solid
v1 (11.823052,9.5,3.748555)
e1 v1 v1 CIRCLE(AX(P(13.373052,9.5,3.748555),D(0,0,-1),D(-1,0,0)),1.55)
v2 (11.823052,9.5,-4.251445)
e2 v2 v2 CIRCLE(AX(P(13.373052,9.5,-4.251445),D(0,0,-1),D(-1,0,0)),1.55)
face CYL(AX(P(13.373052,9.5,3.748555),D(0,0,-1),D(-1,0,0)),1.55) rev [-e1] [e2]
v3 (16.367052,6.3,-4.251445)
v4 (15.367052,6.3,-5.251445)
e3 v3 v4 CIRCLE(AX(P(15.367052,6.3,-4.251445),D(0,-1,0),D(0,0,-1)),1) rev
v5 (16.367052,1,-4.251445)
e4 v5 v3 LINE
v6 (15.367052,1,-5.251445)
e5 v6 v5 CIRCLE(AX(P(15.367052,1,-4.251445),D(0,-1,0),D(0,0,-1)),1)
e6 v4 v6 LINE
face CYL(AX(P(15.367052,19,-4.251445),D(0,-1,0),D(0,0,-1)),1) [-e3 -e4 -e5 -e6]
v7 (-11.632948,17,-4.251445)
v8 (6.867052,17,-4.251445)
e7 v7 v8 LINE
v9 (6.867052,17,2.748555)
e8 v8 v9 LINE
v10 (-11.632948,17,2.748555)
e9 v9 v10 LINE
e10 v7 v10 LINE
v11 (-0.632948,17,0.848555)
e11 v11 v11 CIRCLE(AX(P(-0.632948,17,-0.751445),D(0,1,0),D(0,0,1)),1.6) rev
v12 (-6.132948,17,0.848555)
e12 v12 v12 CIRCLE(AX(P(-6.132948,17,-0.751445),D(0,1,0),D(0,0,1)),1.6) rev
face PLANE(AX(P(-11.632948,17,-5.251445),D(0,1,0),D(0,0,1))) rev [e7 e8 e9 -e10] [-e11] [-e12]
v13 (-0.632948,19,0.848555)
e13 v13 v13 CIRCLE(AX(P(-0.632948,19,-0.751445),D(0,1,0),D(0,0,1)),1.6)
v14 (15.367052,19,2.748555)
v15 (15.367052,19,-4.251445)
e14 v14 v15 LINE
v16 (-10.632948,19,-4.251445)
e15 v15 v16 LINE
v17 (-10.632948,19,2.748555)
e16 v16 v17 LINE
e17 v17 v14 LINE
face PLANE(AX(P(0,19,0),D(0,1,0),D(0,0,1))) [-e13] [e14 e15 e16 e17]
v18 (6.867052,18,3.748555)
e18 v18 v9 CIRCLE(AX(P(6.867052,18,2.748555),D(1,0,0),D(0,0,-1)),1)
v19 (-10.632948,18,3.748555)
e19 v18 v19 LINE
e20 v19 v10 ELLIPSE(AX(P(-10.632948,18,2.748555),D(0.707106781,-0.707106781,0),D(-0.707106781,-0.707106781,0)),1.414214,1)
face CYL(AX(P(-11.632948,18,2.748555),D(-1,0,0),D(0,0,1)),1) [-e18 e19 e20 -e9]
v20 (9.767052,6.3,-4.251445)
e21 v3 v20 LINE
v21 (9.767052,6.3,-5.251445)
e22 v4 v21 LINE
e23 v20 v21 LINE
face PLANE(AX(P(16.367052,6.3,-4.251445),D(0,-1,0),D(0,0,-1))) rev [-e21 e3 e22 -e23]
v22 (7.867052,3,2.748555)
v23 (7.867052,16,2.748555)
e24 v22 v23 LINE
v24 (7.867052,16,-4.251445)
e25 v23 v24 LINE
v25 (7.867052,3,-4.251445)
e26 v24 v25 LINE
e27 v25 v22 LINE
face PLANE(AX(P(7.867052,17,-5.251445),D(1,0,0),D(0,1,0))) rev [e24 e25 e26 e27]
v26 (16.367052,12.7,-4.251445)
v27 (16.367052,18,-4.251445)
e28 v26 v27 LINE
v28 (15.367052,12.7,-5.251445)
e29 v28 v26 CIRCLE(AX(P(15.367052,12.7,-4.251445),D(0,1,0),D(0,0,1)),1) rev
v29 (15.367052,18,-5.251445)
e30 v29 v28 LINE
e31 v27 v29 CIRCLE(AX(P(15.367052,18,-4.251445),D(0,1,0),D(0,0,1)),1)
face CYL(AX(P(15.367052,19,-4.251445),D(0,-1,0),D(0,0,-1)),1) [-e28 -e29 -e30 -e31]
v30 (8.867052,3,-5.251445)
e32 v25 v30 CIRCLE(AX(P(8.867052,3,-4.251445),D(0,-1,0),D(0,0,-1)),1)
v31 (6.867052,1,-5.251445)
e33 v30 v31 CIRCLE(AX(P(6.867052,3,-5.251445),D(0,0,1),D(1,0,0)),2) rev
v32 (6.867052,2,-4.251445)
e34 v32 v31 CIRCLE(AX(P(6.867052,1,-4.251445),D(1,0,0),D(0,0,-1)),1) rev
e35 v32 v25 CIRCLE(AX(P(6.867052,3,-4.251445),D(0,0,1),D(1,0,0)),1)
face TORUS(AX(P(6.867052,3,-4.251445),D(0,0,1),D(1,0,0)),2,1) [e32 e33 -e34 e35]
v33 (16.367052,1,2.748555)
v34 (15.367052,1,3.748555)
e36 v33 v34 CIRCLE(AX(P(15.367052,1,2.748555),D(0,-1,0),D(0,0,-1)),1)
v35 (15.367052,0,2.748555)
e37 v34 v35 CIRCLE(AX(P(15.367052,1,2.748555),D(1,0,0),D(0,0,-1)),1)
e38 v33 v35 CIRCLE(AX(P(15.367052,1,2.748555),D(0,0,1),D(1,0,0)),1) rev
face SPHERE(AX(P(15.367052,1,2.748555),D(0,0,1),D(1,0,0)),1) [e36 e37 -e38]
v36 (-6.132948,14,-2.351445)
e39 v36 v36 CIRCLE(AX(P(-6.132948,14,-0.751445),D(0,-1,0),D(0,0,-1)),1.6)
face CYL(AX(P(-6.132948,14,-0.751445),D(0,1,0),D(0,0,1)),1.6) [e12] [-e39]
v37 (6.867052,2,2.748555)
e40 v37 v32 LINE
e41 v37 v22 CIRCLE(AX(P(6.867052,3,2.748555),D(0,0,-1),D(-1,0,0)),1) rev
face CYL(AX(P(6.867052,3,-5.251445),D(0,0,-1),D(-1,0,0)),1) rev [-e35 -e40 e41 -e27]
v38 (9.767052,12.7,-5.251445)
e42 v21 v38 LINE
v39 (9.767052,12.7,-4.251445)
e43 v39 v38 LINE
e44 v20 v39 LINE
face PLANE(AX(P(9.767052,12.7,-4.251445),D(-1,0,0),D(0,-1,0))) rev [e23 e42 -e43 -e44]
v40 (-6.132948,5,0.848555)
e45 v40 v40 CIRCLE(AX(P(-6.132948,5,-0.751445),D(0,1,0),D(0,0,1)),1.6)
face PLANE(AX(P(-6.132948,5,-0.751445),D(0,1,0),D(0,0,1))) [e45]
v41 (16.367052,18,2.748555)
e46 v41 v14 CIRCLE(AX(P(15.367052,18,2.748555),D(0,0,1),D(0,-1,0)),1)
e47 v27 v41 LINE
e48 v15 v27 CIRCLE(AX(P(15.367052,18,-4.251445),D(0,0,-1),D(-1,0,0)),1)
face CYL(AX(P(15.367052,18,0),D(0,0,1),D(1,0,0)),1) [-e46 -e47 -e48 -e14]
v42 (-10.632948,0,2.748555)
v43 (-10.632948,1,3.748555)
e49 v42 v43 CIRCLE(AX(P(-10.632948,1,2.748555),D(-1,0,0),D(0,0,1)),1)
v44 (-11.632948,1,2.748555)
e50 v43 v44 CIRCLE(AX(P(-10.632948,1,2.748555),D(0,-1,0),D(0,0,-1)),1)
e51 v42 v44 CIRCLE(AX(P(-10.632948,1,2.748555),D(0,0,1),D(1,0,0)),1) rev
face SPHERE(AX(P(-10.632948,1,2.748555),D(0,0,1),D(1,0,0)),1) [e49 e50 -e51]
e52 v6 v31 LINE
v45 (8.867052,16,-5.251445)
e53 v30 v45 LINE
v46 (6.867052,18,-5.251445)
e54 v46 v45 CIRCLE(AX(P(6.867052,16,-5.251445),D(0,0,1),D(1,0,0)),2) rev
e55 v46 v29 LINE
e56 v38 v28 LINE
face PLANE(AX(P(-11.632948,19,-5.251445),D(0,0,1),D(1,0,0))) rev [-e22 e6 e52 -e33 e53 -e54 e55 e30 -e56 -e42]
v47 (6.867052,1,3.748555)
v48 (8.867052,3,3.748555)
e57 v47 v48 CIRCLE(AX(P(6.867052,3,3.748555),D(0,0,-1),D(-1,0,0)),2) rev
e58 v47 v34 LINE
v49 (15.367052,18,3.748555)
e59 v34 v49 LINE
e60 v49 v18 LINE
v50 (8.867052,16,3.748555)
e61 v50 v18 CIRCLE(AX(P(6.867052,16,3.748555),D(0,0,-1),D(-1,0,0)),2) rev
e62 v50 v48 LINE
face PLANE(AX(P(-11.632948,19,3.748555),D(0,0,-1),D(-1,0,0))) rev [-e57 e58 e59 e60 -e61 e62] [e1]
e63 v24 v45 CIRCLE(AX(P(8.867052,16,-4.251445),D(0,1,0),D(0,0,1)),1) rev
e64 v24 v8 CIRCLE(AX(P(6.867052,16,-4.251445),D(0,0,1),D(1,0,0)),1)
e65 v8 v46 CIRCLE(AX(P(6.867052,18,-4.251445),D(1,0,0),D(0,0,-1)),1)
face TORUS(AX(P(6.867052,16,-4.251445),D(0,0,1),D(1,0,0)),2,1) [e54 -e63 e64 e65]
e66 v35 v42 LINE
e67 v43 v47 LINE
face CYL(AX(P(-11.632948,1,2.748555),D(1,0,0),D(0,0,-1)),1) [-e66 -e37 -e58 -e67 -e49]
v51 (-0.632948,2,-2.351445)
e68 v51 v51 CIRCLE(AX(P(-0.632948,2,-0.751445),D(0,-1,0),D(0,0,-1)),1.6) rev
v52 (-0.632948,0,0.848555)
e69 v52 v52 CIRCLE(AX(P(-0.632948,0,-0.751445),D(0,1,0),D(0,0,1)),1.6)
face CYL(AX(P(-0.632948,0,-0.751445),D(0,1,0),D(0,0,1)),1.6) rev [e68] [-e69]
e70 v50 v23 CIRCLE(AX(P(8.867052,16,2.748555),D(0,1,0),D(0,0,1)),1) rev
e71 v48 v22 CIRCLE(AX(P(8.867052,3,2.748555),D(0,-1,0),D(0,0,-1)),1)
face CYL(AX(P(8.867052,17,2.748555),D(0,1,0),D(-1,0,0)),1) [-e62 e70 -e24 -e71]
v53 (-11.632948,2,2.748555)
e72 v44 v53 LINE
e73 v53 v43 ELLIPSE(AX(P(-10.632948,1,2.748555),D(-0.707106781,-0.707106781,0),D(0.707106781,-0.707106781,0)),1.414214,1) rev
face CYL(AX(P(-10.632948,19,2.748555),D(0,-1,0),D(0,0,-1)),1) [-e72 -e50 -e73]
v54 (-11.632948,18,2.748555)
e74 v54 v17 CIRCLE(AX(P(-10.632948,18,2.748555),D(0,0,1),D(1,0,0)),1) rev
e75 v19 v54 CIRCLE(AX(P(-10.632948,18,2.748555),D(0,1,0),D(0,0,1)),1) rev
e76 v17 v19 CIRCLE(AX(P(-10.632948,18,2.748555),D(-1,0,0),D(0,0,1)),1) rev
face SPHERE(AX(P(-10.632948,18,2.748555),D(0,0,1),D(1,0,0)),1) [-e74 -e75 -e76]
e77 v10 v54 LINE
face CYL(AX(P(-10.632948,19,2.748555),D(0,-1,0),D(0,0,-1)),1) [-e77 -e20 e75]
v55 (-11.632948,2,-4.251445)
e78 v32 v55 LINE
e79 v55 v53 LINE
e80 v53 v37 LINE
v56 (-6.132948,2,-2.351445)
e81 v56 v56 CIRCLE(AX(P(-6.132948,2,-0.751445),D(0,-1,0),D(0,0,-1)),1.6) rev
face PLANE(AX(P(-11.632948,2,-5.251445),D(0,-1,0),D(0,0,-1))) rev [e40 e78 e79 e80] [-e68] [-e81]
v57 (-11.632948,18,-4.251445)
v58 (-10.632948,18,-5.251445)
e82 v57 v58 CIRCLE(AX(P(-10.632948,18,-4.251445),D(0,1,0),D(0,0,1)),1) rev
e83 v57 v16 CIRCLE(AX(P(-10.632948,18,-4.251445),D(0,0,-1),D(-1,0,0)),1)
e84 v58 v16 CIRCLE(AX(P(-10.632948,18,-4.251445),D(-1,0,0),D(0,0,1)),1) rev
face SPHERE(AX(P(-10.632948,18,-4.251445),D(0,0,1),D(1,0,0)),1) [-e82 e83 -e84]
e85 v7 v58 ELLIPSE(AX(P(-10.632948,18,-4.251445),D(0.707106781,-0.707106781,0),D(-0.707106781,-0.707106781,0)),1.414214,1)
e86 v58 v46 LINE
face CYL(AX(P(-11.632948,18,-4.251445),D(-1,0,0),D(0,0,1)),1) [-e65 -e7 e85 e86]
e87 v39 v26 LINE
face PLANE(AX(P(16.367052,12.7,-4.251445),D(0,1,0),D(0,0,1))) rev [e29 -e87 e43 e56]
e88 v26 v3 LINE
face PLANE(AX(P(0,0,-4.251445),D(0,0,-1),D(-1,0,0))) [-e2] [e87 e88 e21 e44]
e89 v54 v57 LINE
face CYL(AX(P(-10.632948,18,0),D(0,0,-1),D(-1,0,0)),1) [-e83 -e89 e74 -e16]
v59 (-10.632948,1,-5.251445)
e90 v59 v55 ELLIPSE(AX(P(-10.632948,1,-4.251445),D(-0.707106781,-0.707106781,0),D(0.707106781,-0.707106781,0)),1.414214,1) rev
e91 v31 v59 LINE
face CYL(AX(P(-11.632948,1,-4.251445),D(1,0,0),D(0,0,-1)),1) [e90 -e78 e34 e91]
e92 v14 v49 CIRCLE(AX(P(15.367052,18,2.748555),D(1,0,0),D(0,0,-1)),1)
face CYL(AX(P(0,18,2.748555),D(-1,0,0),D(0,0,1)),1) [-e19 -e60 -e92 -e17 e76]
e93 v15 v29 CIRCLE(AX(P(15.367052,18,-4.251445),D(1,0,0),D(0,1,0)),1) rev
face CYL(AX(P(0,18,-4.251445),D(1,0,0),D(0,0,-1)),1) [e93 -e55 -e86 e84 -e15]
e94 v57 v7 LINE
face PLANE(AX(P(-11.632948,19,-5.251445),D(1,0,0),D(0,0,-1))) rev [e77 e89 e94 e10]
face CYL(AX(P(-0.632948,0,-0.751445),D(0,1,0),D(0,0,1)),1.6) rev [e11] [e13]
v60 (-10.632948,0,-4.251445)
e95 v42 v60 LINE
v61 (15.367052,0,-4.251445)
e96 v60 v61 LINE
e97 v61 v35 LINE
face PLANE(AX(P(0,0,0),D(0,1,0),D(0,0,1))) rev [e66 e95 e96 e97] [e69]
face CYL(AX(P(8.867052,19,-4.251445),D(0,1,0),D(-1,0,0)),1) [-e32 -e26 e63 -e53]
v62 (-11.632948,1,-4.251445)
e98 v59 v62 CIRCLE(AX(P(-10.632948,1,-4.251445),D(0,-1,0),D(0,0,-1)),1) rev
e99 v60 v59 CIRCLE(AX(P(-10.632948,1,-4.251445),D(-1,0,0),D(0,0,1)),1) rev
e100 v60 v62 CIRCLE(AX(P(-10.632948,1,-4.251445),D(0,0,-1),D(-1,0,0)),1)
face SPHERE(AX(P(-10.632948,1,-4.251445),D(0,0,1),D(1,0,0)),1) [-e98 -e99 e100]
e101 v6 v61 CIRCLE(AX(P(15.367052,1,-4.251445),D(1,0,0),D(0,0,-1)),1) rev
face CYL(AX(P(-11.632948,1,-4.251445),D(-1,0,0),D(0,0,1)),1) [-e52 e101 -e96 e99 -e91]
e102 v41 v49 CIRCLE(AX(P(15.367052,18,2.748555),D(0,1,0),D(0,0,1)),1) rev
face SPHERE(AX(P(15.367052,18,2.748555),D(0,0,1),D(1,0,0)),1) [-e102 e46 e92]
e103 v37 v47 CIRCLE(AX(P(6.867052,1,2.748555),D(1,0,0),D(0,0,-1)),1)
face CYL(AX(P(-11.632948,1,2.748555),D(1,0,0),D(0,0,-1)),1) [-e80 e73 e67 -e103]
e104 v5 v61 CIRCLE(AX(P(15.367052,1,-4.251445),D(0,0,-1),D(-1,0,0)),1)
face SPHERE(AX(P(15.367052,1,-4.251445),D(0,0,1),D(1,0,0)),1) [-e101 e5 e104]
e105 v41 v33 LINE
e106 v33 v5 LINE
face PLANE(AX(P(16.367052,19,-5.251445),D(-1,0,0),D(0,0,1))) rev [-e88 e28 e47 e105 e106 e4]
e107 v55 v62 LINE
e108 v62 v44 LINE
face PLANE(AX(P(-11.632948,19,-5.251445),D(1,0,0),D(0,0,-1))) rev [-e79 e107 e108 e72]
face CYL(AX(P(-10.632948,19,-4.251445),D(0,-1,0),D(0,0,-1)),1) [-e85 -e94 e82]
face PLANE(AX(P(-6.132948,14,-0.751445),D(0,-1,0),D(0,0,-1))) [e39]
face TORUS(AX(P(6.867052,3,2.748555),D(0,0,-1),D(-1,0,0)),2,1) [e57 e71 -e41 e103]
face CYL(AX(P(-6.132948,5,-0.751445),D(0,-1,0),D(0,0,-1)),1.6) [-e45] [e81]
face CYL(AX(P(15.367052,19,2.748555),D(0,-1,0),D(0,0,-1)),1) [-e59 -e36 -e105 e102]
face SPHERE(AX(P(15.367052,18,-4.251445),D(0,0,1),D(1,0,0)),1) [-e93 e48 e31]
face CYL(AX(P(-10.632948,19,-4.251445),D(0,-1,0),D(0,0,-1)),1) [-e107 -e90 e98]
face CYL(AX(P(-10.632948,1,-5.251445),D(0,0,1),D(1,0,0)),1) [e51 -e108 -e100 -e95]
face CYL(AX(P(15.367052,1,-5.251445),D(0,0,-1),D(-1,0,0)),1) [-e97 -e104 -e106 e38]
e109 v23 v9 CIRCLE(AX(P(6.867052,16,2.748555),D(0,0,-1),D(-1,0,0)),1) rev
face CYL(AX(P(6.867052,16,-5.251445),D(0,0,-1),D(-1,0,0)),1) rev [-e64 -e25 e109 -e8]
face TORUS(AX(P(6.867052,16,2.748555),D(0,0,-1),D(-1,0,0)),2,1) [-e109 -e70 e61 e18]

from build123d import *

# Parameters (mm, degrees)
SKETCH1_W      = 28
SKETCH1_H      = 9
EXTRUDE1_DEPTH = 19
SKETCH2_R      = 1.6
EXTRUDE2_DEPTH = 26.621437653
SKETCH3_W      = 19.5
SKETCH3_H      = 15
EXTRUDE3_DEPTH = 27.643580689
SKETCH6_R      = 1.6
EXTRUDE4_DEPTH = 3
EXTRUDE5_START = 3
SKETCH7_R      = 1.6
EXTRUDE5_DEPTH = 3
SKETCH8_W      = 6.6
SKETCH8_H      = 6.4
EXTRUDE6_DEPTH = 1
SKETCH9_R      = 1.55
EXTRUDE7_DEPTH = 27.322621297
FILLET1_R      = 1


with BuildPart() as part:
    # Sketch1 → Extrude1 (new body)
    with BuildSketch(Plane(origin=(0, 0, 0), x_dir=(1, 0, 0), z_dir=(0, 1, 0))):
        with Locations((2.367052023, 0.751445087)):
            Rectangle(SKETCH1_W, SKETCH1_H)
    extrude(amount=EXTRUDE1_DEPTH)

    # Sketch2 → Extrude2 (cut, through all)
    with BuildSketch(Plane(origin=(0, 19, 0), x_dir=(1, 0, 0), z_dir=(0, 1, 0))):
        with Locations(Location((-0.632947977, 0.751445087, 0), (0, 0, 270))):
            Circle(SKETCH2_R)
    extrude(amount=-EXTRUDE2_DEPTH, mode=Mode.SUBTRACT)

    # Sketch3 → Extrude3 (cut, through all)
    with BuildSketch(Plane.XY.offset(3.748554913)):
        with Locations((-1.882947977, 9.5)):
            Rectangle(SKETCH3_W, SKETCH3_H)
    extrude(amount=-EXTRUDE3_DEPTH, mode=Mode.SUBTRACT)

    # Sketch6 → Extrude4 (add)
    with BuildSketch(Plane(origin=(0, 2, 0), x_dir=(1, 0, 0), z_dir=(0, 1, 0))):
        with Locations(Location((-6.132947977, 0.751445087, 0), (0, 0, 90))):
            Circle(SKETCH6_R)
    extrude(amount=EXTRUDE4_DEPTH)

    # Sketch7 → Extrude5 (add)
    with BuildSketch(Plane.XZ.offset(-17).offset(EXTRUDE5_START)):
        with Locations(Location((-6.132947977, -0.751445087, 0), (0, 0, 270))):
            Circle(SKETCH7_R)
    extrude(amount=-EXTRUDE5_DEPTH)

    # Sketch8 → Extrude6 (cut)
    with BuildSketch(Plane(origin=(0, 0, -5.251445087), x_dir=(-1, 0, 0), z_dir=(0, 0, -1))):
        with Locations((-13.067052023, 9.5)):
            Rectangle(SKETCH8_W, SKETCH8_H)
    extrude(amount=-EXTRUDE6_DEPTH, mode=Mode.SUBTRACT)

    # Sketch9 → Extrude7 (cut, through all)
    with BuildSketch(Plane(origin=(0, 0, -4.251445087), x_dir=(-1, 0, 0), z_dir=(0, 0, -1))):
        with Locations((-13.373052023, 9.5)):
            Circle(SKETCH9_R)
    extrude(amount=-EXTRUDE7_DEPTH, mode=Mode.SUBTRACT)

    # Fillet1
    fillet1_edges = [part.edges().sort_by_distance(p)[0] for p in [
        (2.367052023, 19, -5.251445087),
        (2.367052023, 0, 3.748554913),
        (2.367052023, 0, -5.251445087),
        (16.367052023, 0, -0.751445087),
        (16.367052023, 3.15, -5.251445087),
        (16.367052023, 9.5, 3.748554913),
        (-11.632947977, 0, -0.751445087),
        (-1.882947977, 2, 3.748554913),
        (-1.882947977, 2, -5.251445087),
        (7.867052023, 2, -0.751445087),
        (7.867052023, 17, -0.751445087),
        (7.867052023, 9.5, -5.251445087),
        (-1.882947977, 17, -5.251445087),
        (-11.632947977, 19, -0.751445087),
        (7.867052023, 9.5, 3.748554913),
        (-1.882947977, 17, 3.748554913),
        (2.367052023, 19, 3.748554913),
        (16.367052023, 19, -0.751445087),
        (16.367052023, 15.85, -5.251445087),
        (-11.632947977, 1, -5.251445087),
        (-11.632947977, 1, 3.748554913),
        (-11.632947977, 18, -5.251445087),
        (-11.632947977, 18, 3.748554913),
    ]]
    fillet(fillet1_edges, radius=FILLET1_R - 0.0001)  # a hair under: the kernel refuses the full size


solid = part.part
